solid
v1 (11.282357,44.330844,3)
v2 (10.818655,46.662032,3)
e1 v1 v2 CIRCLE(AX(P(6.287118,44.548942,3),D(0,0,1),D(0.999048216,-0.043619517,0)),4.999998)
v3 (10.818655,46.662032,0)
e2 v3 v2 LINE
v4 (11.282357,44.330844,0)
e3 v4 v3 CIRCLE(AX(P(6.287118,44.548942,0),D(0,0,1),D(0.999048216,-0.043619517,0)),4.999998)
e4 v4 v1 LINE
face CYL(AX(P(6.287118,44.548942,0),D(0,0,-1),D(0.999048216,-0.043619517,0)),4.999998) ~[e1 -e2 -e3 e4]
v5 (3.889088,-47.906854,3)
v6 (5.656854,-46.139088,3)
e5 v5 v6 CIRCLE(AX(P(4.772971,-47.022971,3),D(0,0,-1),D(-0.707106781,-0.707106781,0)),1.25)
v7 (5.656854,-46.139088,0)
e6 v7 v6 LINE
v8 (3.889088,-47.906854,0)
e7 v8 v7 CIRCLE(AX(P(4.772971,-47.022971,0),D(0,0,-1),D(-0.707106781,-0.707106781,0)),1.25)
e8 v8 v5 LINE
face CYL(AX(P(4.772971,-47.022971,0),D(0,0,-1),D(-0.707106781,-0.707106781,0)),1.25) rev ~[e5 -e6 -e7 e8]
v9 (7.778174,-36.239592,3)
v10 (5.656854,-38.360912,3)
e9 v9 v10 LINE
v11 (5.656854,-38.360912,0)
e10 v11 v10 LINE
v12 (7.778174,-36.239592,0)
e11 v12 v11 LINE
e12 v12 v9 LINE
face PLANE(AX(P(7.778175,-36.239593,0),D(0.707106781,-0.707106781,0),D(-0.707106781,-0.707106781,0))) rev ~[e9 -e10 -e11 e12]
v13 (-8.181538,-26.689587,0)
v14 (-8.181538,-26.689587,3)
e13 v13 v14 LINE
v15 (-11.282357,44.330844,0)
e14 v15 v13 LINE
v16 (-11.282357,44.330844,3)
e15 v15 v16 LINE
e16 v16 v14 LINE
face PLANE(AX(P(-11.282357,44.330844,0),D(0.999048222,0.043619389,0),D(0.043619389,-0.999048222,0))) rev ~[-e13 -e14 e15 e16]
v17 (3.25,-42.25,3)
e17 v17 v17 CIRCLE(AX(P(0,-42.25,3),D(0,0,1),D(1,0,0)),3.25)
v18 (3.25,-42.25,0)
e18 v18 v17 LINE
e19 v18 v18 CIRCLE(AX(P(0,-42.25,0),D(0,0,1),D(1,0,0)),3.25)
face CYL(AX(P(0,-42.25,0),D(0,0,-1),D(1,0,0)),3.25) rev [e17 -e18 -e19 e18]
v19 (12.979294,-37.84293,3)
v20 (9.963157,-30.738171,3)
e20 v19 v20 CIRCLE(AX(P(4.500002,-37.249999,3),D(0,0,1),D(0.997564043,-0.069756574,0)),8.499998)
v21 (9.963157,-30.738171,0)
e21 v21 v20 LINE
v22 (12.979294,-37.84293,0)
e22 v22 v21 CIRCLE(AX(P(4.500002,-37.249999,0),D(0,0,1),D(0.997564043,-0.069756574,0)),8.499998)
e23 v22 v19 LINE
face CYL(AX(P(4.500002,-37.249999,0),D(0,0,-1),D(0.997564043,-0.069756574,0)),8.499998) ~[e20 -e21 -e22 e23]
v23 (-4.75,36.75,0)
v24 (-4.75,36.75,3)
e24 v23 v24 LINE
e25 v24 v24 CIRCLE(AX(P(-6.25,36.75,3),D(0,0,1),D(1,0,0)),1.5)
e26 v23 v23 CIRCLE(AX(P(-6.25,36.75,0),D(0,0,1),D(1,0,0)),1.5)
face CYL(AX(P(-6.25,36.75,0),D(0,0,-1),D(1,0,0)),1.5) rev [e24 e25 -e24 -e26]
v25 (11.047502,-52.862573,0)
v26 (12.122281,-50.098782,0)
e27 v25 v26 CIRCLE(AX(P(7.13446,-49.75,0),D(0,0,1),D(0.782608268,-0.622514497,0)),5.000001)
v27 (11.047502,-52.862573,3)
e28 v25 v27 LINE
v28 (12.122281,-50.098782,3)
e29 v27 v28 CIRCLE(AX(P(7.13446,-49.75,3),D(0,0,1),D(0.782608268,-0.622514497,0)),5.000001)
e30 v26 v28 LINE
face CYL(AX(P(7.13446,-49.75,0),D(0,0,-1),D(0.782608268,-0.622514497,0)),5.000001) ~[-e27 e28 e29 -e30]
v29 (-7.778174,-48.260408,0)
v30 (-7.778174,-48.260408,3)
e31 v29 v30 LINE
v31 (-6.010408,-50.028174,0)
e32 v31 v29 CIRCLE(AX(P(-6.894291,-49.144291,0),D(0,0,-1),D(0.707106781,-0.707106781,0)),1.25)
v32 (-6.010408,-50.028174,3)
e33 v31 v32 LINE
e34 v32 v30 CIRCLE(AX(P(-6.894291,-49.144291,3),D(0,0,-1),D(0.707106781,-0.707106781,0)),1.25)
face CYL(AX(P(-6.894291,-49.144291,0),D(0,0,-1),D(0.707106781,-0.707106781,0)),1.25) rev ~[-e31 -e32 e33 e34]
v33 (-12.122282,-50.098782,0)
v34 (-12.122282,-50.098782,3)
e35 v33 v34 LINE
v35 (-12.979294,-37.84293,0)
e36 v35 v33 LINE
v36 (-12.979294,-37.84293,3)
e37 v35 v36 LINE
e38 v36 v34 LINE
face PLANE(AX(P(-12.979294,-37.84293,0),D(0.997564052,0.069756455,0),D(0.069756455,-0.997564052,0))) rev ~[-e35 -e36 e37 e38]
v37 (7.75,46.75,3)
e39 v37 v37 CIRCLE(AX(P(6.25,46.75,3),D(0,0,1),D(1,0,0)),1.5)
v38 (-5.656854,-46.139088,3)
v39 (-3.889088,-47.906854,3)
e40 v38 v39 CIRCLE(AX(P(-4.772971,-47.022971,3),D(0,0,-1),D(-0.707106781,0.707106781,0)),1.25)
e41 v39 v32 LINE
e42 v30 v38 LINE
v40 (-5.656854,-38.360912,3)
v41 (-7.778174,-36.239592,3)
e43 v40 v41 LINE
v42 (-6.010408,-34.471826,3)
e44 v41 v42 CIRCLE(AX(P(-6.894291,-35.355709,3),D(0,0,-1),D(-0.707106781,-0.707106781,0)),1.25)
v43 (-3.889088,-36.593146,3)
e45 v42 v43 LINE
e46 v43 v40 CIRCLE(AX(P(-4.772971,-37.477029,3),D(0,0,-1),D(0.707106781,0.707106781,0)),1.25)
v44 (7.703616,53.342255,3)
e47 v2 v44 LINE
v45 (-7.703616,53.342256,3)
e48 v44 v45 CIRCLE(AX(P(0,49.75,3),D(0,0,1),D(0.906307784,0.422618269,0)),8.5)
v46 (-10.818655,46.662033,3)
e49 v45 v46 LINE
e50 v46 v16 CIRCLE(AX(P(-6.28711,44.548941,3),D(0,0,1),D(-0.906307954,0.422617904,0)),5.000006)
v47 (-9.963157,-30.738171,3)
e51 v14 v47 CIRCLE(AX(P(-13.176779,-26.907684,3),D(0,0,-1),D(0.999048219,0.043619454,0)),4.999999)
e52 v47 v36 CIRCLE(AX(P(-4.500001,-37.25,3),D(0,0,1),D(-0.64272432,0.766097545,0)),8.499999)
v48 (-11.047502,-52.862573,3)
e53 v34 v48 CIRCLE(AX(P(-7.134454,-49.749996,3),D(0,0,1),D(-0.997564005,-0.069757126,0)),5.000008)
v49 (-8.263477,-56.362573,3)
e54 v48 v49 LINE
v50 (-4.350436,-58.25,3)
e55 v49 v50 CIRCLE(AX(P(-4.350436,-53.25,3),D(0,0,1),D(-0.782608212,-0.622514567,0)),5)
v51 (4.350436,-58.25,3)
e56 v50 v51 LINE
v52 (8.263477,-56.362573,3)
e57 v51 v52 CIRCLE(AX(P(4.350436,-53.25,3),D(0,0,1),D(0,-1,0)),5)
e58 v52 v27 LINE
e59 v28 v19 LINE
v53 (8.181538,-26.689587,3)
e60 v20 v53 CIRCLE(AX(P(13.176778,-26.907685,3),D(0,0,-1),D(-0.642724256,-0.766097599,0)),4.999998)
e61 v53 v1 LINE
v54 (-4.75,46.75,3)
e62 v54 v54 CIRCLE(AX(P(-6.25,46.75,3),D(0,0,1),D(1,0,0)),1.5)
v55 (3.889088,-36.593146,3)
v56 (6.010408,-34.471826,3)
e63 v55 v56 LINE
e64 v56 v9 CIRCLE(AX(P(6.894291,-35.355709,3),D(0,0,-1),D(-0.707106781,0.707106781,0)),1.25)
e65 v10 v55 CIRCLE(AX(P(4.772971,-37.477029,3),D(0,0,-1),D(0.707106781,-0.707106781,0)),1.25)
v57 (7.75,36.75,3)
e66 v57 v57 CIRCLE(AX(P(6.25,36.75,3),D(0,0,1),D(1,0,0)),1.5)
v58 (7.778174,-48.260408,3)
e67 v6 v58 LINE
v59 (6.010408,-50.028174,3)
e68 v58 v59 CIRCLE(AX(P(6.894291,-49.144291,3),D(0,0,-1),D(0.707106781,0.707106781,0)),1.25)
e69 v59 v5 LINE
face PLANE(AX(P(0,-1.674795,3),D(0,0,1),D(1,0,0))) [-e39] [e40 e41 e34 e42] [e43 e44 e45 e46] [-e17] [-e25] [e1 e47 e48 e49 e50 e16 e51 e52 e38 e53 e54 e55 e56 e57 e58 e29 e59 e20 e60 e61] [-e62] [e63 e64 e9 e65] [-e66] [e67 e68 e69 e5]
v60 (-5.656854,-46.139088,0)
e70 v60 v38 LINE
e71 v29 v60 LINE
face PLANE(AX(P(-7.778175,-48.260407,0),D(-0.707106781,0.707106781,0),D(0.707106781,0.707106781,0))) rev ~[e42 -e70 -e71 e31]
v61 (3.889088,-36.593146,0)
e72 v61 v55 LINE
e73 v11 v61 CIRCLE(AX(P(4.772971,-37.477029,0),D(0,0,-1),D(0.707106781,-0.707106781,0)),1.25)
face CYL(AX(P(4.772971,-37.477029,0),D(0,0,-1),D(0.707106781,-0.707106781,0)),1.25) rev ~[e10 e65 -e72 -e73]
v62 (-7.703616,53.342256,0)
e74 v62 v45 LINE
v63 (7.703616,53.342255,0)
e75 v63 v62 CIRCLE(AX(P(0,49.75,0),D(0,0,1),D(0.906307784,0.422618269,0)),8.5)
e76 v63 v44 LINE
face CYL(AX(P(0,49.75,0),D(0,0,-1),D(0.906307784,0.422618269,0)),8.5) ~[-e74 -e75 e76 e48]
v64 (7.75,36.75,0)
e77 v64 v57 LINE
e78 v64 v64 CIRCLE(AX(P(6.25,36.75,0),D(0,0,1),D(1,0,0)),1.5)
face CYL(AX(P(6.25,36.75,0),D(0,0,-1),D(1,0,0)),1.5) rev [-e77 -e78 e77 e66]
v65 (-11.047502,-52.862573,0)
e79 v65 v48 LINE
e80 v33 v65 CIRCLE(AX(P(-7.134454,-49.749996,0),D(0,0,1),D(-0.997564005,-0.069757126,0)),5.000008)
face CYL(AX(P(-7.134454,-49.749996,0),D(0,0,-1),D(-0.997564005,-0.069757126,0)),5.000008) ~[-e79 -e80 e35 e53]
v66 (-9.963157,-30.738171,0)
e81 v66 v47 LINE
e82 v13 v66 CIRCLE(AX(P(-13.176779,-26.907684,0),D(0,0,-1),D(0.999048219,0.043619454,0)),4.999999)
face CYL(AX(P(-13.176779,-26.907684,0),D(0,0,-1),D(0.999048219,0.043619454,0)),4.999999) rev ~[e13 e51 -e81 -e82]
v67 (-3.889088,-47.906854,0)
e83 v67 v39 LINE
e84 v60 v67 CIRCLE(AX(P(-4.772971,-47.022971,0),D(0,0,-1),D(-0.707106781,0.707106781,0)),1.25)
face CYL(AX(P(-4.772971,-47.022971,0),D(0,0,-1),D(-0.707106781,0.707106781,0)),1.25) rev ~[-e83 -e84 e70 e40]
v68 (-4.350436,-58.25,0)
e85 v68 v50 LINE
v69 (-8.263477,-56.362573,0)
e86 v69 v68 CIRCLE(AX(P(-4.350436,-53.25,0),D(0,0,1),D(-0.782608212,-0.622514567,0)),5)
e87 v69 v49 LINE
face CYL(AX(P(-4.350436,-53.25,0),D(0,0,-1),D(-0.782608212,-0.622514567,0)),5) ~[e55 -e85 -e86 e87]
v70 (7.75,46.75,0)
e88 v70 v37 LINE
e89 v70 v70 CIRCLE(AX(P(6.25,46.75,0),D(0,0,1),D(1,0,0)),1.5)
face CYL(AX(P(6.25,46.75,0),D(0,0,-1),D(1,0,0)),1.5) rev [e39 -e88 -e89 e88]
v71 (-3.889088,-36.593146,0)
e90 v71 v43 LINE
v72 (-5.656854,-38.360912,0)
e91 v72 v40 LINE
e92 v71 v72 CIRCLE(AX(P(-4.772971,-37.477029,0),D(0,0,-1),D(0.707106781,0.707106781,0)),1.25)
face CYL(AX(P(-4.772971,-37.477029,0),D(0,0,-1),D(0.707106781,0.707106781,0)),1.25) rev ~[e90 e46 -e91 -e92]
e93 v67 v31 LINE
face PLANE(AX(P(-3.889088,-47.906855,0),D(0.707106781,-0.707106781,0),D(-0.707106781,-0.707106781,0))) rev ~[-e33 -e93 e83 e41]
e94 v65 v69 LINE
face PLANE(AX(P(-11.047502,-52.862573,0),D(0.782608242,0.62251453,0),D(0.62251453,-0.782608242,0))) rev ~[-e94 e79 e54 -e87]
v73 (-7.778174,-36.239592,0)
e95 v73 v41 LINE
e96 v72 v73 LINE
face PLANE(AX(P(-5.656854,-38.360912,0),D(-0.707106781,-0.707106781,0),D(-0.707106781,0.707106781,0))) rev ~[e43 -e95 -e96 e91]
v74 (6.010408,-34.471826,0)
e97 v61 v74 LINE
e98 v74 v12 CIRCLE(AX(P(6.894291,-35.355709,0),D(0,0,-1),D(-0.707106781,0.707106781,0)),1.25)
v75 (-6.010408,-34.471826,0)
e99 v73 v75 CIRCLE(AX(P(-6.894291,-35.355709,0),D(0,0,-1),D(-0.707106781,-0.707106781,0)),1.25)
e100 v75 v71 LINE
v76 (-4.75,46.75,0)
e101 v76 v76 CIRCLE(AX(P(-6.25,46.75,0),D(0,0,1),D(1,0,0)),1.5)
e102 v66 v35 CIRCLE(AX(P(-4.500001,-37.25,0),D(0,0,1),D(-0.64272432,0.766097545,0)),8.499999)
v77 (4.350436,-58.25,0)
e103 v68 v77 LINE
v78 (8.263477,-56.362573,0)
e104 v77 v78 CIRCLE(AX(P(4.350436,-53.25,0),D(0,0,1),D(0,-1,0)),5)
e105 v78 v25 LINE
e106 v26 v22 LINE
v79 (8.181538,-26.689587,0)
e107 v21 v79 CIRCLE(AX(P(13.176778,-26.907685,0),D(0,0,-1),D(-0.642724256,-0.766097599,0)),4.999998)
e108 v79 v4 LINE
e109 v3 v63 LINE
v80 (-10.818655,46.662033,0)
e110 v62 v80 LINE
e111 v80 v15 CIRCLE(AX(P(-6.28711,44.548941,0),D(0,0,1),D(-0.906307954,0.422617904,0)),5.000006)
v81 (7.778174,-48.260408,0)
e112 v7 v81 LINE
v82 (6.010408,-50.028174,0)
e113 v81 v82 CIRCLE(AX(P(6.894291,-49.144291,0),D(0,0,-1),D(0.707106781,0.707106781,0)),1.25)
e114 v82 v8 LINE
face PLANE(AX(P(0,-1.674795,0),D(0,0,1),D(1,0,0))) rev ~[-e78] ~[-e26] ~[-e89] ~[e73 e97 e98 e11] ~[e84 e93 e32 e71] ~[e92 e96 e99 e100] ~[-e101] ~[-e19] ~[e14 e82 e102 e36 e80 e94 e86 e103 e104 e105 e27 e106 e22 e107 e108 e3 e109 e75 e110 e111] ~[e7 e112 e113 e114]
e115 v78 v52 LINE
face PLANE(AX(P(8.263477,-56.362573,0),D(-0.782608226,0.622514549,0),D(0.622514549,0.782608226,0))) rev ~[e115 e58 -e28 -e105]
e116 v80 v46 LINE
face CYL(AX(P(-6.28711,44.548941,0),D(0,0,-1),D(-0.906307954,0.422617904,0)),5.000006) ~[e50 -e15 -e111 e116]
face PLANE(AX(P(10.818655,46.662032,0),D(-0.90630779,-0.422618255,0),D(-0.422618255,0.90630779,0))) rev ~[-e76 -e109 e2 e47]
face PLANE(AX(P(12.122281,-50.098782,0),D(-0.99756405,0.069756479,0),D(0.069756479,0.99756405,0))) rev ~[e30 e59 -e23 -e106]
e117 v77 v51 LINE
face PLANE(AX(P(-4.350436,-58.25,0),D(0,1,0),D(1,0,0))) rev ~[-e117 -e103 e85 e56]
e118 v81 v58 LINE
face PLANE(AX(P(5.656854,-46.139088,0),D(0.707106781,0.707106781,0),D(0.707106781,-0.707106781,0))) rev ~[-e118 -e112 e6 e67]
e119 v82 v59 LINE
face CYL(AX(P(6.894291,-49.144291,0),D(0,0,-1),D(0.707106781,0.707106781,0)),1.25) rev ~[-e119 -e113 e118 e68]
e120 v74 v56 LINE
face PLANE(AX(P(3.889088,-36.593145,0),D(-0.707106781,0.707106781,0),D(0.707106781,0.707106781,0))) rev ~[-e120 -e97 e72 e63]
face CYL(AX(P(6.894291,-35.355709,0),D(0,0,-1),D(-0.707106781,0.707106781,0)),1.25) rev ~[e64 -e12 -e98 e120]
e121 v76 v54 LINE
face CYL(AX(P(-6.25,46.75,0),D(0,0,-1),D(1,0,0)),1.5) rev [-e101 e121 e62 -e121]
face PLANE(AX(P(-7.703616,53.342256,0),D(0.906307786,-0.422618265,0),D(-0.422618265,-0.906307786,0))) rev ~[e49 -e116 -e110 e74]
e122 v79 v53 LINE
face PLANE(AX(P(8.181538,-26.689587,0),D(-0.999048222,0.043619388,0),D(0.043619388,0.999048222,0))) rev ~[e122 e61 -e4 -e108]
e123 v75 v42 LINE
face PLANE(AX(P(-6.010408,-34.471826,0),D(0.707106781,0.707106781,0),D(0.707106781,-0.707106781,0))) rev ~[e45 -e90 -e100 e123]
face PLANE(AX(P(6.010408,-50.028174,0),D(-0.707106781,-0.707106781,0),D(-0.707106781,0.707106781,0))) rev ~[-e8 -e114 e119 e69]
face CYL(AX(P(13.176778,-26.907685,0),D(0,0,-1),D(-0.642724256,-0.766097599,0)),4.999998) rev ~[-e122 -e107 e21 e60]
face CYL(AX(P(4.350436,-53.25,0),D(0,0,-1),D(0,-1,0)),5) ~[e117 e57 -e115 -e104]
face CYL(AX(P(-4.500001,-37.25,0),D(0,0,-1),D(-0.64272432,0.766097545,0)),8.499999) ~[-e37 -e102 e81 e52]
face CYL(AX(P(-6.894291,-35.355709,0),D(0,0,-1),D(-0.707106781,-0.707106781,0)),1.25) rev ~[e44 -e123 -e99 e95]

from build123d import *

# Parameters (mm, degrees)
F0_R     = 3.25
F0_R_2   = 1.5
F1_DEPTH = 3


# Not quite as in the source:
# - ends of sketch curves that miss each other by under 0.0002 mm in the source are joined


with BuildPart() as f1:
    # F0 (on Top) → F1 (new body)
    with BuildSketch(Plane.XY):
        with BuildLine():
            Line((8.1815379971, -26.6895870666), (11.2823570029, 44.3308440666))
            ThreePointArc((11.2823570029, 44.3308440666), (11.1910423827, 45.524392707), (10.8186548512, 46.6620324888))
            Line((10.8186548512, 46.6620324888), (7.703615805, 53.3422554181))
            ThreePointArc((7.703615805, 53.3422554181), (0, 58.25), (-7.703616047, 53.342255531))
            Line((-7.703616047, 53.342255531), (-10.8186551692, 46.6620326371))
            ThreePointArc((-10.8186551692, 46.6620326371), (-11.1910423827, 45.524392707), (-11.2823571079, 44.330844062))
            Line((-11.2823571079, 44.330844062), (-8.1815379971, -26.6895870666))
            ThreePointArc((-8.1815379971, -26.6895870666), (-8.6003047113, -28.9216063136), (-9.9631570958, -30.7381714698))
            ThreePointArc((-9.9631570958, -30.7381714698), (-12.3241540982, -33.9284623067), (-12.9792944589, -37.8429295738))
            Line((-12.9792944589, -37.8429295738), (-12.1222819893, -50.0987821525))
            ThreePointArc((-12.1222819893, -50.0987821525), (-11.7945005071, -51.5621897781), (-11.0475021701, -52.8625726982))
            Line((-11.0475021701, -52.8625726982), (-8.263477213, -56.3625727323))
            ThreePointArc((-8.263477213, -56.3625727323), (-6.5226625661, -57.753491062), (-4.350436, -58.25))
            Line((-4.350436, -58.25), (4.350436, -58.25))
            ThreePointArc((4.350436, -58.25), (6.5226625661, -57.753491062), (8.2634771701, -56.3625726982))
            Line((8.2634771701, -56.3625726982), (11.047502213, -52.8625727323))
            ThreePointArc((11.047502213, -52.8625727323), (11.7945005071, -51.5621897781), (12.1222812699, -50.0987821022))
            Line((12.1222812699, -50.0987821022), (12.9792940319, -37.8429295439))
            ThreePointArc((12.9792940319, -37.8429295439), (12.3241540982, -33.9284623067), (9.9631572372, -30.7381713013))
            ThreePointArc((9.9631572372, -30.7381713013), (8.6003047113, -28.9216063136), (8.1815379971, -26.6895870666))
        make_face()
        with BuildLine():
            Line((-3.8890875, -47.9068545), (-6.0104075, -50.0281745))
            ThreePointArc((-6.0104075235, -50.0281744765), (-7.7781744765, -50.0281744765), (-7.7781744765, -48.2604075235))
            Line((-7.7781745, -48.2604075), (-5.6568545, -46.1390875))
            ThreePointArc((-5.6568544765, -46.1390875235), (-3.8890875235, -46.1390875235), (-3.8890875235, -47.9068544765))
        make_face(mode=Mode.SUBTRACT)
        with BuildLine():
            ThreePointArc((-7.7781744765, -36.2395924765), (-7.7781744765, -34.4718255235), (-6.0104075235, -34.4718255235))
            Line((-6.0104075, -34.4718255), (-3.8890875, -36.5931455))
            ThreePointArc((-3.8890875235, -36.5931455235), (-3.8890875235, -38.3609124765), (-5.6568544765, -38.3609124765))
            Line((-5.6568545, -38.3609125), (-7.7781745, -36.2395925))
        make_face(mode=Mode.SUBTRACT)
        with Locations((0, -42.25)):
            Circle(F0_R, mode=Mode.SUBTRACT)
        with BuildLine():
            ThreePointArc((3.8890875235, -47.9068544765), (3.8890875235, -46.1390875235), (5.6568544765, -46.1390875235))
            Line((5.6568545, -46.1390875), (7.7781745, -48.2604075))
            ThreePointArc((7.7781744765, -48.2604075235), (7.7781744765, -50.0281744765), (6.0104075235, -50.0281744765))
            Line((6.0104075, -50.0281745), (3.8890875, -47.9068545))
        make_face(mode=Mode.SUBTRACT)
        with BuildLine():
            ThreePointArc((5.6568544765, -38.3609124765), (3.8890875235, -38.3609124765), (3.8890875235, -36.5931455235))
            Line((3.8890875, -36.5931455), (6.0104075, -34.4718255))
            ThreePointArc((6.0104075235, -34.4718255235), (7.7781744765, -34.4718255235), (7.7781744765, -36.2395924765))
            Line((7.7781745, -36.2395925), (5.6568545, -38.3609125))
        make_face(mode=Mode.SUBTRACT)
        with Locations((-6.25, 36.75)):
            Circle(F0_R_2, mode=Mode.SUBTRACT)
        with Locations((-6.25, 46.75)):
            Circle(F0_R_2, mode=Mode.SUBTRACT)
        with Locations((6.25, 36.75)):
            Circle(F0_R_2, mode=Mode.SUBTRACT)
        with Locations((6.25, 46.75)):
            Circle(F0_R_2, mode=Mode.SUBTRACT)
    extrude(amount=F1_DEPTH)


solid = f1.part
